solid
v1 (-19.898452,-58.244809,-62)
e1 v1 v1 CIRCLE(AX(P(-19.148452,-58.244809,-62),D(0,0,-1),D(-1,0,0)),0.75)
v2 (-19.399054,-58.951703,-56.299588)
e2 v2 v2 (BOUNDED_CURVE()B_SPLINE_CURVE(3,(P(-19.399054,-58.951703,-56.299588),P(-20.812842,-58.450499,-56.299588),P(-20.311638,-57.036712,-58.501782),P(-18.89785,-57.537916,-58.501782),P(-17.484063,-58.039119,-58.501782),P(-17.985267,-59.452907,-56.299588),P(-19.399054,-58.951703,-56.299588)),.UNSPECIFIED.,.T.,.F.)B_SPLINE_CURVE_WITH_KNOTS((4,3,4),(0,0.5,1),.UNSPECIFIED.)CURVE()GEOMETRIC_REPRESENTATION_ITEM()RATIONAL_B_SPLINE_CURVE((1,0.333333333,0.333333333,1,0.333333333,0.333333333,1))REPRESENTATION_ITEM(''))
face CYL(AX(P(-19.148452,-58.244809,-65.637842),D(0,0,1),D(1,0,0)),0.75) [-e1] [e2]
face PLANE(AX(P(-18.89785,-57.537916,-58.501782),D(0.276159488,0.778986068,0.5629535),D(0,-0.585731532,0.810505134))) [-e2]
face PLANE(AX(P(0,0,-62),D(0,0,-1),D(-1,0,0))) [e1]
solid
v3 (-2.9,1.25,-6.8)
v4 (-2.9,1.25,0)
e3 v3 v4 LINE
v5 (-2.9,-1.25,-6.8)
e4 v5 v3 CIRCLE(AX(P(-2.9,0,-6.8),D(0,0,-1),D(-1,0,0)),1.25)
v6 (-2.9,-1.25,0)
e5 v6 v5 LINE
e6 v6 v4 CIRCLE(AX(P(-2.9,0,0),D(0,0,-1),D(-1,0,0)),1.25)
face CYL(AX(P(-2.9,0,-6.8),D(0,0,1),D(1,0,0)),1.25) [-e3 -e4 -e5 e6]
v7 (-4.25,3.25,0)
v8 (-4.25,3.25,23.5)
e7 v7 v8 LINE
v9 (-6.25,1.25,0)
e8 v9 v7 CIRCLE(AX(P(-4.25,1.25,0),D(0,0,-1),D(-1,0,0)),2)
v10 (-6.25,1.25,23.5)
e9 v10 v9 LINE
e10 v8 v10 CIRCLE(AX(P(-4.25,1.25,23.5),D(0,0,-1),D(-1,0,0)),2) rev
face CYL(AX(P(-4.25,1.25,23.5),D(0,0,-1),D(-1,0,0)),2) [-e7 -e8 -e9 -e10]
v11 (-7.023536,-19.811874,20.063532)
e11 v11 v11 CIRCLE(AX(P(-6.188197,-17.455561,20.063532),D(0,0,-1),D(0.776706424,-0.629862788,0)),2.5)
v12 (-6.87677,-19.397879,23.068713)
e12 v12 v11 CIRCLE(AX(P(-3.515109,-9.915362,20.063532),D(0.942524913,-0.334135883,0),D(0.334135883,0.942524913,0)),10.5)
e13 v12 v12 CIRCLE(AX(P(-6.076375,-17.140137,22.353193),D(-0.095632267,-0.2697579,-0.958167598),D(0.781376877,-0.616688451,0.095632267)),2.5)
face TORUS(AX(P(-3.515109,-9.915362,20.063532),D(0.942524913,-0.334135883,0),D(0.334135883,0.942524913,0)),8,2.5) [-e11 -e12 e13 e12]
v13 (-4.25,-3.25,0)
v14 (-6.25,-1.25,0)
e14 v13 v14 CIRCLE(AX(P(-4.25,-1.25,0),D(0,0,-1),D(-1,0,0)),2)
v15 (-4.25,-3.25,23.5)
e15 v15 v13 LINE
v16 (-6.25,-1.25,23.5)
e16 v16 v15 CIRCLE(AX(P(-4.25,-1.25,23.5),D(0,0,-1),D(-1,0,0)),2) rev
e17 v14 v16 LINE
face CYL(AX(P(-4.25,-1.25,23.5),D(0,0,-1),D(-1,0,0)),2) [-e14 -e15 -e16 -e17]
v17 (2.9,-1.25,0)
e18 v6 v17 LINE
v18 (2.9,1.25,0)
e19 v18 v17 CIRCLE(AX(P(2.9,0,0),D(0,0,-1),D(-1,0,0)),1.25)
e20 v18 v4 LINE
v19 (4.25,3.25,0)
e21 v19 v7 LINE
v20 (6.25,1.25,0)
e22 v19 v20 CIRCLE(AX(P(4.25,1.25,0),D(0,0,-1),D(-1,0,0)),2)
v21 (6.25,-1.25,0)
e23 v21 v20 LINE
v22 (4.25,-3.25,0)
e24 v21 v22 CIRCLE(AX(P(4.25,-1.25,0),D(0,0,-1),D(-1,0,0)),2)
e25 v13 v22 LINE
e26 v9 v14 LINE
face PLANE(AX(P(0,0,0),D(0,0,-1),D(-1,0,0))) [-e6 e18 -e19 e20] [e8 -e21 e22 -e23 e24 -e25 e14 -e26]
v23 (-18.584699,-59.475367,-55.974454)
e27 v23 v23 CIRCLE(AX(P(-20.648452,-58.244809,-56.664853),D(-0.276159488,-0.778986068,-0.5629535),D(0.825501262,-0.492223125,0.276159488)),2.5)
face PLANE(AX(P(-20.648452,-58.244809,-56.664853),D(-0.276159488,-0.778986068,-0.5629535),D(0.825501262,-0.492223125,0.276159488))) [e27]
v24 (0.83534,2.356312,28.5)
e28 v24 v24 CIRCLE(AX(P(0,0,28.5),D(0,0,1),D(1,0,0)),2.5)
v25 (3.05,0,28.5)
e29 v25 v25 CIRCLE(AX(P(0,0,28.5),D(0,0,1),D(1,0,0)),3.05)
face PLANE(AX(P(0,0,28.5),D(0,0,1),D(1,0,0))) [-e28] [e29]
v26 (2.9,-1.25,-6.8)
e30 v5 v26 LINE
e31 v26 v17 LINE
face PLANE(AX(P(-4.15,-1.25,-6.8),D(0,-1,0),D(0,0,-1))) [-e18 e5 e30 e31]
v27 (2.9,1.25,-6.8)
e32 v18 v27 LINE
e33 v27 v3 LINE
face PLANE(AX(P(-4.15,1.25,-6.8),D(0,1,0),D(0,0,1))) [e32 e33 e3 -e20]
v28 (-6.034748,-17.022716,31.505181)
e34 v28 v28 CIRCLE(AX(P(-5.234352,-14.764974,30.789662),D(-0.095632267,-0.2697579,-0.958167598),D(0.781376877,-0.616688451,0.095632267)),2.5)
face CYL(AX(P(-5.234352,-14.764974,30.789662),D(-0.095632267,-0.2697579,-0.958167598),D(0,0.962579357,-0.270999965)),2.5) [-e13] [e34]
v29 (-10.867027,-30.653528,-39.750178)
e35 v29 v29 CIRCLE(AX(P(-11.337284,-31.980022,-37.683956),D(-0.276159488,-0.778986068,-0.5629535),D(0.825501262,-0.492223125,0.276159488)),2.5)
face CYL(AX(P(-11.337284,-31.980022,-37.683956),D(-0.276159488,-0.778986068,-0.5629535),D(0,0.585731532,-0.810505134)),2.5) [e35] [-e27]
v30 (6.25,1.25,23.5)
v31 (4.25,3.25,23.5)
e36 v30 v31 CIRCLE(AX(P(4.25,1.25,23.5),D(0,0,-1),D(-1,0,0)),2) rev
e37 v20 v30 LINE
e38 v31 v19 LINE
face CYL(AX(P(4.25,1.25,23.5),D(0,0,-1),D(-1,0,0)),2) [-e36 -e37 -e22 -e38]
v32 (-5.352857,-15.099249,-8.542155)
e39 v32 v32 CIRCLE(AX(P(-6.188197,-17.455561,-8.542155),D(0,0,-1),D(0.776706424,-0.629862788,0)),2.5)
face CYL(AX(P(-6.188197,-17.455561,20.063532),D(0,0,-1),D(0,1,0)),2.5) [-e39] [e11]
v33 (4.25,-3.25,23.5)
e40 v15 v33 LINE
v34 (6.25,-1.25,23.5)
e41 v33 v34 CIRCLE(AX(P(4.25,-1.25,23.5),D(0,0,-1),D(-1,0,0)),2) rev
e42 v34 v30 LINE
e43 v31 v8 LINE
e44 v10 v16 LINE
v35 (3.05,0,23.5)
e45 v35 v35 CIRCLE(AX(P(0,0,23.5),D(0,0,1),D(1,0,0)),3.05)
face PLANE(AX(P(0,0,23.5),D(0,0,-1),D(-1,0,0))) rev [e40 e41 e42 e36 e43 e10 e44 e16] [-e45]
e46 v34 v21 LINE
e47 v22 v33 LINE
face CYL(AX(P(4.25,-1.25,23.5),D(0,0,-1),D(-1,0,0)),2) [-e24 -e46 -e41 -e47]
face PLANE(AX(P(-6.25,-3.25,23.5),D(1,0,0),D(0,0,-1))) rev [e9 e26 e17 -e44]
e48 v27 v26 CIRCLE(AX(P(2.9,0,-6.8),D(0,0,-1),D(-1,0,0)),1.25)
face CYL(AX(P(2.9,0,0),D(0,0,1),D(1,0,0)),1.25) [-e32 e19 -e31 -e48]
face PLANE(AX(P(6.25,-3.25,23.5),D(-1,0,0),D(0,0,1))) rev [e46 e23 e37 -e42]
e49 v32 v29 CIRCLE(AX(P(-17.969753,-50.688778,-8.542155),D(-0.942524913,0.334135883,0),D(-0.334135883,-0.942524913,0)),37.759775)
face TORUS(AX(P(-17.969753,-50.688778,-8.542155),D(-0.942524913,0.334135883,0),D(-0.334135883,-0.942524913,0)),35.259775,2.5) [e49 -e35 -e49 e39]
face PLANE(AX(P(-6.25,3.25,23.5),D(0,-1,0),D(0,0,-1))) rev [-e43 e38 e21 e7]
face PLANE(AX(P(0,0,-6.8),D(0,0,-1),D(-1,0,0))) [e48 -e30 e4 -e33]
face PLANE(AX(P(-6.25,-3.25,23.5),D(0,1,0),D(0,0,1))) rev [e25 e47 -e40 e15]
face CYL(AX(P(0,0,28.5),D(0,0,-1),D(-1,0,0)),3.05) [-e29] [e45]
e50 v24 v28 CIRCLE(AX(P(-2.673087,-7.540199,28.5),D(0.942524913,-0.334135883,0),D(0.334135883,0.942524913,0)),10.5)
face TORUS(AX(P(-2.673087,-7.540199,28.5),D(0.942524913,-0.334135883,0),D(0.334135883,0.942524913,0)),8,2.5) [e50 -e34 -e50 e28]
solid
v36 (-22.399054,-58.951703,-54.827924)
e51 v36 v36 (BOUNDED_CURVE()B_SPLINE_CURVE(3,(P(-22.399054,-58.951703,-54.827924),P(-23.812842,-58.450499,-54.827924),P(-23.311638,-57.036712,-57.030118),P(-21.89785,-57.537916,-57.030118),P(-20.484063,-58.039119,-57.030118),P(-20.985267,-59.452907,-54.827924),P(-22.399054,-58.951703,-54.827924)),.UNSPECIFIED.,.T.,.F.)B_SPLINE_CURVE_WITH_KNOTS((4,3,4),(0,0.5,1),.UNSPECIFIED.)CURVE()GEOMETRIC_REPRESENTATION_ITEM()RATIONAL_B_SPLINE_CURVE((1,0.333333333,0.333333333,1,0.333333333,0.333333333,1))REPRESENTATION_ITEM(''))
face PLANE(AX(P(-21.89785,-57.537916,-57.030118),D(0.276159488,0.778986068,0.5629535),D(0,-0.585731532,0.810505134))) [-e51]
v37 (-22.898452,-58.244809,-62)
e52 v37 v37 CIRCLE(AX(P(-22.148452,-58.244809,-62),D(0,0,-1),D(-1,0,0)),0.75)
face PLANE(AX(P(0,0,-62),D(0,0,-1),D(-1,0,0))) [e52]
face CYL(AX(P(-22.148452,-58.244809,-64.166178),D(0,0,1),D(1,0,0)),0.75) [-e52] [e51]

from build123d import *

# Parameters (mm, degrees)
SKETCH1_W                 = 12.5
SKETCH1_H                 = 6.5
BOSS_EXTRUDE1_DEPTH       = 23.5
SKETCH2_R                 = 3.05
BOSS_EXTRUDE2_DEPTH       = 5
SKETCH3_R                 = 2.5
SKETCH5_W                 = 8.3
SKETCH5_H                 = 2.5
BOSS_EXTRUDE3_DEPTH       = 6.8
FILLET1_RADIUS            = 1.25
FILLET1_LENGTH            = 6.8
FILLET2_RADIUS            = 1.25
FILLET2_LENGTH            = 6.8
FILLET3_R                 = 2
BOSS_EXTRUDE6_START       = -62
BOSS_EXTRUDE6_OUTLINE_R   = 0.75
BOSS_EXTRUDE6_DEPTH       = 4.969882251
BOSS_EXTRUDE6_START_2     = -57.030117749
BOSS_EXTRUDE6_2_OUTLINE_R = 0.75
BOSS_EXTRUDE6_2_DEPTH     = 2.202194261
BOSS_EXTRUDE6_START_3     = -82.97383816
BOSS_EXTRUDE6_3_OUTLINE_W = 5
BOSS_EXTRUDE6_3_OUTLINE_H = 6
BOSS_EXTRUDE6_3_DEPTH     = 1.97383816
BOSS_EXTRUDE6_4_OUTLINE_R = 0.75
BOSS_EXTRUDE6_4_DEPTH     = 3.498218139
BOSS_EXTRUDE6_START_4     = -58.501781861
BOSS_EXTRUDE6_5_OUTLINE_R = 0.75
BOSS_EXTRUDE6_5_DEPTH     = 2.20219426
BOSS_EXTRUDE6_6_OUTLINE_W = 5
BOSS_EXTRUDE6_6_OUTLINE_H = 5
BOSS_EXTRUDE6_6_DEPTH     = 1.97383816


with BuildPart() as part:
    # Sketch1 → Boss-Extrude1 (new body)
    with BuildSketch(Plane.XY):
        Rectangle(SKETCH1_W, SKETCH1_H)
    extrude(amount=BOSS_EXTRUDE1_DEPTH)

    # Sketch2 → Boss-Extrude2 (add)
    with BuildSketch(Plane.XY.offset(23.5)):
        Circle(SKETCH2_R)
    extrude(amount=BOSS_EXTRUDE2_DEPTH)

    # Sweep1: sweep along a path in Sketch4
    with BuildLine(Plane(origin=(0, 0, 0), x_dir=(0, 0, -1), z_dir=(0.9425249130903538, -0.3341358828441223, 0))) as sweep1_path:
        Line((56.664852675, -61.796572691), (37.683956267, -33.930161138))
        ThreePointArc((37.683956267, -33.930161138), (25.024855626, -22.609720048), (8.542155439, -18.52))
        Line((8.542155439, -18.52), (-20.063531525, -18.52))
        ThreePointArc((-20.063531525, -18.52), (-21.220526285, -18.435893072), (-22.353193227, -18.185340781))
        Line((-22.353193227, -18.185340781), (-30.789661702, -15.665340781))
        ThreePointArc((-30.789661702, -15.665340781), (-36.415893072, -6.84300524), (-28.5, 0))
    # Sketch3 → Sweep1 (sweep)
    with BuildSketch(Plane.XY.offset(28.5)):
        Circle(SKETCH3_R)
    sweep(path=sweep1_path.line)

    # Sketch5 → Boss-Extrude3 (add)
    with BuildSketch(Plane.XY):
        Rectangle(SKETCH5_W, SKETCH5_H)
    extrude(amount=-BOSS_EXTRUDE3_DEPTH)

    # Fillet1: full round fillet: the end face becomes a half cylinder, R = half its width
    fillet1_face = Plane((4.15, 0, -3.4), x_dir=(0, 0, 1), z_dir=(1, 0, 0))  # on the end face: x along it, z out of the body
    fillet1_slab = fillet1_face.offset(-FILLET1_RADIUS / 2) * Box(FILLET1_LENGTH, 2 * FILLET1_RADIUS, FILLET1_RADIUS, mode=Mode.PRIVATE)  # the body's end, R deep
    fillet1_round = Plane((2.9, 0, -3.4), x_dir=(1, 0, 0), z_dir=(0, 0, 1)) * Cylinder(FILLET1_RADIUS, FILLET1_LENGTH, mode=Mode.PRIVATE)  # its axis R under the face
    add(fillet1_slab - fillet1_round, mode=Mode.SUBTRACT)

    # Fillet2: full round fillet: the end face becomes a half cylinder, R = half its width
    fillet2_face = Plane((-4.15, 0, -3.4), x_dir=(0, 0, 1), z_dir=(-1, 0, 0))  # on the end face: x along it, z out of the body
    fillet2_slab = fillet2_face.offset(-FILLET2_RADIUS / 2) * Box(FILLET2_LENGTH, 2 * FILLET2_RADIUS, FILLET2_RADIUS, mode=Mode.PRIVATE)  # the body's end, R deep
    fillet2_round = Plane((-2.9, 0, -3.4), x_dir=(-1, 0, 0), z_dir=(0, 0, 1)) * Cylinder(FILLET2_RADIUS, FILLET2_LENGTH, mode=Mode.PRIVATE)  # its axis R under the face
    add(fillet2_slab - fillet2_round, mode=Mode.SUBTRACT)

    # Fillet3
    fillet3_edges = [part.edges().sort_by_distance(p)[0] for p in [
        (6.25, -3.25, 11.75),
        (-6.25, -3.25, 11.75),
        (-6.25, 3.25, 11.75),
        (6.25, 3.25, 11.75),
    ]]
    fillet(fillet3_edges, radius=FILLET3_R)


with BuildPart() as body_2:
    # Boss-Extrude6: read off the stored shape, not the designer's step
    # Boss-Extrude6 outline → Boss-Extrude6 (new body)
    with BuildSketch(Plane.XY.offset(BOSS_EXTRUDE6_START)):
        with Locations((-22.148452373, -58.244809305)):
            Circle(BOSS_EXTRUDE6_OUTLINE_R)
    extrude(amount=BOSS_EXTRUDE6_DEPTH)

    # Boss-Extrude6 2 outline → Boss-Extrude6 2 (add)
    with BuildSketch(Plane.XY.offset(BOSS_EXTRUDE6_START_2)):
        with Locations((-22.148452373, -58.244809305)):
            Circle(BOSS_EXTRUDE6_2_OUTLINE_R)
    extrude(amount=BOSS_EXTRUDE6_2_DEPTH)

    # Boss-Extrude6 3 outline → Boss-Extrude6 3 (cut)
    with BuildSketch(Plane(origin=(0, 0, 0), x_dir=(0.9611118234588524, -0.22382868291463434, -0.1617553198887132), z_dir=(0.276159487991269, 0.7789860675917779, 0.5629535004689981)).offset(BOSS_EXTRUDE6_START_3)):
        with Locations((0.5, 11)):
            Rectangle(BOSS_EXTRUDE6_3_OUTLINE_W, BOSS_EXTRUDE6_3_OUTLINE_H)
    extrude(amount=BOSS_EXTRUDE6_3_DEPTH, mode=Mode.SUBTRACT)


with BuildPart() as body_3:
    # Boss-Extrude6 4 outline → Boss-Extrude6 4 (new body)
    with BuildSketch(Plane.XY.offset(BOSS_EXTRUDE6_START)):
        with Locations((-19.148452373, -58.244809305)):
            Circle(BOSS_EXTRUDE6_4_OUTLINE_R)
    extrude(amount=BOSS_EXTRUDE6_4_DEPTH)

    # Boss-Extrude6 5 outline → Boss-Extrude6 5 (add)
    with BuildSketch(Plane.XY.offset(BOSS_EXTRUDE6_START_4)):
        with Locations((-19.148452373, -58.244809305)):
            Circle(BOSS_EXTRUDE6_5_OUTLINE_R)
    extrude(amount=BOSS_EXTRUDE6_5_DEPTH)

    # Boss-Extrude6 6 outline → Boss-Extrude6 6 (cut)
    with BuildSketch(Plane(origin=(0, 0, 0), x_dir=(0.9611118234588528, -0.22382868291463243, -0.16175531988871258), z_dir=(0.2761594879912671, 0.7789860675917771, 0.5629535004690001)).offset(BOSS_EXTRUDE6_START_3)):
        with Locations((3.5, 12.5)):
            Rectangle(BOSS_EXTRUDE6_6_OUTLINE_W, BOSS_EXTRUDE6_6_OUTLINE_H)
    extrude(amount=BOSS_EXTRUDE6_6_DEPTH, mode=Mode.SUBTRACT)


solid = Compound([part.part, body_2.part, body_3.part])
